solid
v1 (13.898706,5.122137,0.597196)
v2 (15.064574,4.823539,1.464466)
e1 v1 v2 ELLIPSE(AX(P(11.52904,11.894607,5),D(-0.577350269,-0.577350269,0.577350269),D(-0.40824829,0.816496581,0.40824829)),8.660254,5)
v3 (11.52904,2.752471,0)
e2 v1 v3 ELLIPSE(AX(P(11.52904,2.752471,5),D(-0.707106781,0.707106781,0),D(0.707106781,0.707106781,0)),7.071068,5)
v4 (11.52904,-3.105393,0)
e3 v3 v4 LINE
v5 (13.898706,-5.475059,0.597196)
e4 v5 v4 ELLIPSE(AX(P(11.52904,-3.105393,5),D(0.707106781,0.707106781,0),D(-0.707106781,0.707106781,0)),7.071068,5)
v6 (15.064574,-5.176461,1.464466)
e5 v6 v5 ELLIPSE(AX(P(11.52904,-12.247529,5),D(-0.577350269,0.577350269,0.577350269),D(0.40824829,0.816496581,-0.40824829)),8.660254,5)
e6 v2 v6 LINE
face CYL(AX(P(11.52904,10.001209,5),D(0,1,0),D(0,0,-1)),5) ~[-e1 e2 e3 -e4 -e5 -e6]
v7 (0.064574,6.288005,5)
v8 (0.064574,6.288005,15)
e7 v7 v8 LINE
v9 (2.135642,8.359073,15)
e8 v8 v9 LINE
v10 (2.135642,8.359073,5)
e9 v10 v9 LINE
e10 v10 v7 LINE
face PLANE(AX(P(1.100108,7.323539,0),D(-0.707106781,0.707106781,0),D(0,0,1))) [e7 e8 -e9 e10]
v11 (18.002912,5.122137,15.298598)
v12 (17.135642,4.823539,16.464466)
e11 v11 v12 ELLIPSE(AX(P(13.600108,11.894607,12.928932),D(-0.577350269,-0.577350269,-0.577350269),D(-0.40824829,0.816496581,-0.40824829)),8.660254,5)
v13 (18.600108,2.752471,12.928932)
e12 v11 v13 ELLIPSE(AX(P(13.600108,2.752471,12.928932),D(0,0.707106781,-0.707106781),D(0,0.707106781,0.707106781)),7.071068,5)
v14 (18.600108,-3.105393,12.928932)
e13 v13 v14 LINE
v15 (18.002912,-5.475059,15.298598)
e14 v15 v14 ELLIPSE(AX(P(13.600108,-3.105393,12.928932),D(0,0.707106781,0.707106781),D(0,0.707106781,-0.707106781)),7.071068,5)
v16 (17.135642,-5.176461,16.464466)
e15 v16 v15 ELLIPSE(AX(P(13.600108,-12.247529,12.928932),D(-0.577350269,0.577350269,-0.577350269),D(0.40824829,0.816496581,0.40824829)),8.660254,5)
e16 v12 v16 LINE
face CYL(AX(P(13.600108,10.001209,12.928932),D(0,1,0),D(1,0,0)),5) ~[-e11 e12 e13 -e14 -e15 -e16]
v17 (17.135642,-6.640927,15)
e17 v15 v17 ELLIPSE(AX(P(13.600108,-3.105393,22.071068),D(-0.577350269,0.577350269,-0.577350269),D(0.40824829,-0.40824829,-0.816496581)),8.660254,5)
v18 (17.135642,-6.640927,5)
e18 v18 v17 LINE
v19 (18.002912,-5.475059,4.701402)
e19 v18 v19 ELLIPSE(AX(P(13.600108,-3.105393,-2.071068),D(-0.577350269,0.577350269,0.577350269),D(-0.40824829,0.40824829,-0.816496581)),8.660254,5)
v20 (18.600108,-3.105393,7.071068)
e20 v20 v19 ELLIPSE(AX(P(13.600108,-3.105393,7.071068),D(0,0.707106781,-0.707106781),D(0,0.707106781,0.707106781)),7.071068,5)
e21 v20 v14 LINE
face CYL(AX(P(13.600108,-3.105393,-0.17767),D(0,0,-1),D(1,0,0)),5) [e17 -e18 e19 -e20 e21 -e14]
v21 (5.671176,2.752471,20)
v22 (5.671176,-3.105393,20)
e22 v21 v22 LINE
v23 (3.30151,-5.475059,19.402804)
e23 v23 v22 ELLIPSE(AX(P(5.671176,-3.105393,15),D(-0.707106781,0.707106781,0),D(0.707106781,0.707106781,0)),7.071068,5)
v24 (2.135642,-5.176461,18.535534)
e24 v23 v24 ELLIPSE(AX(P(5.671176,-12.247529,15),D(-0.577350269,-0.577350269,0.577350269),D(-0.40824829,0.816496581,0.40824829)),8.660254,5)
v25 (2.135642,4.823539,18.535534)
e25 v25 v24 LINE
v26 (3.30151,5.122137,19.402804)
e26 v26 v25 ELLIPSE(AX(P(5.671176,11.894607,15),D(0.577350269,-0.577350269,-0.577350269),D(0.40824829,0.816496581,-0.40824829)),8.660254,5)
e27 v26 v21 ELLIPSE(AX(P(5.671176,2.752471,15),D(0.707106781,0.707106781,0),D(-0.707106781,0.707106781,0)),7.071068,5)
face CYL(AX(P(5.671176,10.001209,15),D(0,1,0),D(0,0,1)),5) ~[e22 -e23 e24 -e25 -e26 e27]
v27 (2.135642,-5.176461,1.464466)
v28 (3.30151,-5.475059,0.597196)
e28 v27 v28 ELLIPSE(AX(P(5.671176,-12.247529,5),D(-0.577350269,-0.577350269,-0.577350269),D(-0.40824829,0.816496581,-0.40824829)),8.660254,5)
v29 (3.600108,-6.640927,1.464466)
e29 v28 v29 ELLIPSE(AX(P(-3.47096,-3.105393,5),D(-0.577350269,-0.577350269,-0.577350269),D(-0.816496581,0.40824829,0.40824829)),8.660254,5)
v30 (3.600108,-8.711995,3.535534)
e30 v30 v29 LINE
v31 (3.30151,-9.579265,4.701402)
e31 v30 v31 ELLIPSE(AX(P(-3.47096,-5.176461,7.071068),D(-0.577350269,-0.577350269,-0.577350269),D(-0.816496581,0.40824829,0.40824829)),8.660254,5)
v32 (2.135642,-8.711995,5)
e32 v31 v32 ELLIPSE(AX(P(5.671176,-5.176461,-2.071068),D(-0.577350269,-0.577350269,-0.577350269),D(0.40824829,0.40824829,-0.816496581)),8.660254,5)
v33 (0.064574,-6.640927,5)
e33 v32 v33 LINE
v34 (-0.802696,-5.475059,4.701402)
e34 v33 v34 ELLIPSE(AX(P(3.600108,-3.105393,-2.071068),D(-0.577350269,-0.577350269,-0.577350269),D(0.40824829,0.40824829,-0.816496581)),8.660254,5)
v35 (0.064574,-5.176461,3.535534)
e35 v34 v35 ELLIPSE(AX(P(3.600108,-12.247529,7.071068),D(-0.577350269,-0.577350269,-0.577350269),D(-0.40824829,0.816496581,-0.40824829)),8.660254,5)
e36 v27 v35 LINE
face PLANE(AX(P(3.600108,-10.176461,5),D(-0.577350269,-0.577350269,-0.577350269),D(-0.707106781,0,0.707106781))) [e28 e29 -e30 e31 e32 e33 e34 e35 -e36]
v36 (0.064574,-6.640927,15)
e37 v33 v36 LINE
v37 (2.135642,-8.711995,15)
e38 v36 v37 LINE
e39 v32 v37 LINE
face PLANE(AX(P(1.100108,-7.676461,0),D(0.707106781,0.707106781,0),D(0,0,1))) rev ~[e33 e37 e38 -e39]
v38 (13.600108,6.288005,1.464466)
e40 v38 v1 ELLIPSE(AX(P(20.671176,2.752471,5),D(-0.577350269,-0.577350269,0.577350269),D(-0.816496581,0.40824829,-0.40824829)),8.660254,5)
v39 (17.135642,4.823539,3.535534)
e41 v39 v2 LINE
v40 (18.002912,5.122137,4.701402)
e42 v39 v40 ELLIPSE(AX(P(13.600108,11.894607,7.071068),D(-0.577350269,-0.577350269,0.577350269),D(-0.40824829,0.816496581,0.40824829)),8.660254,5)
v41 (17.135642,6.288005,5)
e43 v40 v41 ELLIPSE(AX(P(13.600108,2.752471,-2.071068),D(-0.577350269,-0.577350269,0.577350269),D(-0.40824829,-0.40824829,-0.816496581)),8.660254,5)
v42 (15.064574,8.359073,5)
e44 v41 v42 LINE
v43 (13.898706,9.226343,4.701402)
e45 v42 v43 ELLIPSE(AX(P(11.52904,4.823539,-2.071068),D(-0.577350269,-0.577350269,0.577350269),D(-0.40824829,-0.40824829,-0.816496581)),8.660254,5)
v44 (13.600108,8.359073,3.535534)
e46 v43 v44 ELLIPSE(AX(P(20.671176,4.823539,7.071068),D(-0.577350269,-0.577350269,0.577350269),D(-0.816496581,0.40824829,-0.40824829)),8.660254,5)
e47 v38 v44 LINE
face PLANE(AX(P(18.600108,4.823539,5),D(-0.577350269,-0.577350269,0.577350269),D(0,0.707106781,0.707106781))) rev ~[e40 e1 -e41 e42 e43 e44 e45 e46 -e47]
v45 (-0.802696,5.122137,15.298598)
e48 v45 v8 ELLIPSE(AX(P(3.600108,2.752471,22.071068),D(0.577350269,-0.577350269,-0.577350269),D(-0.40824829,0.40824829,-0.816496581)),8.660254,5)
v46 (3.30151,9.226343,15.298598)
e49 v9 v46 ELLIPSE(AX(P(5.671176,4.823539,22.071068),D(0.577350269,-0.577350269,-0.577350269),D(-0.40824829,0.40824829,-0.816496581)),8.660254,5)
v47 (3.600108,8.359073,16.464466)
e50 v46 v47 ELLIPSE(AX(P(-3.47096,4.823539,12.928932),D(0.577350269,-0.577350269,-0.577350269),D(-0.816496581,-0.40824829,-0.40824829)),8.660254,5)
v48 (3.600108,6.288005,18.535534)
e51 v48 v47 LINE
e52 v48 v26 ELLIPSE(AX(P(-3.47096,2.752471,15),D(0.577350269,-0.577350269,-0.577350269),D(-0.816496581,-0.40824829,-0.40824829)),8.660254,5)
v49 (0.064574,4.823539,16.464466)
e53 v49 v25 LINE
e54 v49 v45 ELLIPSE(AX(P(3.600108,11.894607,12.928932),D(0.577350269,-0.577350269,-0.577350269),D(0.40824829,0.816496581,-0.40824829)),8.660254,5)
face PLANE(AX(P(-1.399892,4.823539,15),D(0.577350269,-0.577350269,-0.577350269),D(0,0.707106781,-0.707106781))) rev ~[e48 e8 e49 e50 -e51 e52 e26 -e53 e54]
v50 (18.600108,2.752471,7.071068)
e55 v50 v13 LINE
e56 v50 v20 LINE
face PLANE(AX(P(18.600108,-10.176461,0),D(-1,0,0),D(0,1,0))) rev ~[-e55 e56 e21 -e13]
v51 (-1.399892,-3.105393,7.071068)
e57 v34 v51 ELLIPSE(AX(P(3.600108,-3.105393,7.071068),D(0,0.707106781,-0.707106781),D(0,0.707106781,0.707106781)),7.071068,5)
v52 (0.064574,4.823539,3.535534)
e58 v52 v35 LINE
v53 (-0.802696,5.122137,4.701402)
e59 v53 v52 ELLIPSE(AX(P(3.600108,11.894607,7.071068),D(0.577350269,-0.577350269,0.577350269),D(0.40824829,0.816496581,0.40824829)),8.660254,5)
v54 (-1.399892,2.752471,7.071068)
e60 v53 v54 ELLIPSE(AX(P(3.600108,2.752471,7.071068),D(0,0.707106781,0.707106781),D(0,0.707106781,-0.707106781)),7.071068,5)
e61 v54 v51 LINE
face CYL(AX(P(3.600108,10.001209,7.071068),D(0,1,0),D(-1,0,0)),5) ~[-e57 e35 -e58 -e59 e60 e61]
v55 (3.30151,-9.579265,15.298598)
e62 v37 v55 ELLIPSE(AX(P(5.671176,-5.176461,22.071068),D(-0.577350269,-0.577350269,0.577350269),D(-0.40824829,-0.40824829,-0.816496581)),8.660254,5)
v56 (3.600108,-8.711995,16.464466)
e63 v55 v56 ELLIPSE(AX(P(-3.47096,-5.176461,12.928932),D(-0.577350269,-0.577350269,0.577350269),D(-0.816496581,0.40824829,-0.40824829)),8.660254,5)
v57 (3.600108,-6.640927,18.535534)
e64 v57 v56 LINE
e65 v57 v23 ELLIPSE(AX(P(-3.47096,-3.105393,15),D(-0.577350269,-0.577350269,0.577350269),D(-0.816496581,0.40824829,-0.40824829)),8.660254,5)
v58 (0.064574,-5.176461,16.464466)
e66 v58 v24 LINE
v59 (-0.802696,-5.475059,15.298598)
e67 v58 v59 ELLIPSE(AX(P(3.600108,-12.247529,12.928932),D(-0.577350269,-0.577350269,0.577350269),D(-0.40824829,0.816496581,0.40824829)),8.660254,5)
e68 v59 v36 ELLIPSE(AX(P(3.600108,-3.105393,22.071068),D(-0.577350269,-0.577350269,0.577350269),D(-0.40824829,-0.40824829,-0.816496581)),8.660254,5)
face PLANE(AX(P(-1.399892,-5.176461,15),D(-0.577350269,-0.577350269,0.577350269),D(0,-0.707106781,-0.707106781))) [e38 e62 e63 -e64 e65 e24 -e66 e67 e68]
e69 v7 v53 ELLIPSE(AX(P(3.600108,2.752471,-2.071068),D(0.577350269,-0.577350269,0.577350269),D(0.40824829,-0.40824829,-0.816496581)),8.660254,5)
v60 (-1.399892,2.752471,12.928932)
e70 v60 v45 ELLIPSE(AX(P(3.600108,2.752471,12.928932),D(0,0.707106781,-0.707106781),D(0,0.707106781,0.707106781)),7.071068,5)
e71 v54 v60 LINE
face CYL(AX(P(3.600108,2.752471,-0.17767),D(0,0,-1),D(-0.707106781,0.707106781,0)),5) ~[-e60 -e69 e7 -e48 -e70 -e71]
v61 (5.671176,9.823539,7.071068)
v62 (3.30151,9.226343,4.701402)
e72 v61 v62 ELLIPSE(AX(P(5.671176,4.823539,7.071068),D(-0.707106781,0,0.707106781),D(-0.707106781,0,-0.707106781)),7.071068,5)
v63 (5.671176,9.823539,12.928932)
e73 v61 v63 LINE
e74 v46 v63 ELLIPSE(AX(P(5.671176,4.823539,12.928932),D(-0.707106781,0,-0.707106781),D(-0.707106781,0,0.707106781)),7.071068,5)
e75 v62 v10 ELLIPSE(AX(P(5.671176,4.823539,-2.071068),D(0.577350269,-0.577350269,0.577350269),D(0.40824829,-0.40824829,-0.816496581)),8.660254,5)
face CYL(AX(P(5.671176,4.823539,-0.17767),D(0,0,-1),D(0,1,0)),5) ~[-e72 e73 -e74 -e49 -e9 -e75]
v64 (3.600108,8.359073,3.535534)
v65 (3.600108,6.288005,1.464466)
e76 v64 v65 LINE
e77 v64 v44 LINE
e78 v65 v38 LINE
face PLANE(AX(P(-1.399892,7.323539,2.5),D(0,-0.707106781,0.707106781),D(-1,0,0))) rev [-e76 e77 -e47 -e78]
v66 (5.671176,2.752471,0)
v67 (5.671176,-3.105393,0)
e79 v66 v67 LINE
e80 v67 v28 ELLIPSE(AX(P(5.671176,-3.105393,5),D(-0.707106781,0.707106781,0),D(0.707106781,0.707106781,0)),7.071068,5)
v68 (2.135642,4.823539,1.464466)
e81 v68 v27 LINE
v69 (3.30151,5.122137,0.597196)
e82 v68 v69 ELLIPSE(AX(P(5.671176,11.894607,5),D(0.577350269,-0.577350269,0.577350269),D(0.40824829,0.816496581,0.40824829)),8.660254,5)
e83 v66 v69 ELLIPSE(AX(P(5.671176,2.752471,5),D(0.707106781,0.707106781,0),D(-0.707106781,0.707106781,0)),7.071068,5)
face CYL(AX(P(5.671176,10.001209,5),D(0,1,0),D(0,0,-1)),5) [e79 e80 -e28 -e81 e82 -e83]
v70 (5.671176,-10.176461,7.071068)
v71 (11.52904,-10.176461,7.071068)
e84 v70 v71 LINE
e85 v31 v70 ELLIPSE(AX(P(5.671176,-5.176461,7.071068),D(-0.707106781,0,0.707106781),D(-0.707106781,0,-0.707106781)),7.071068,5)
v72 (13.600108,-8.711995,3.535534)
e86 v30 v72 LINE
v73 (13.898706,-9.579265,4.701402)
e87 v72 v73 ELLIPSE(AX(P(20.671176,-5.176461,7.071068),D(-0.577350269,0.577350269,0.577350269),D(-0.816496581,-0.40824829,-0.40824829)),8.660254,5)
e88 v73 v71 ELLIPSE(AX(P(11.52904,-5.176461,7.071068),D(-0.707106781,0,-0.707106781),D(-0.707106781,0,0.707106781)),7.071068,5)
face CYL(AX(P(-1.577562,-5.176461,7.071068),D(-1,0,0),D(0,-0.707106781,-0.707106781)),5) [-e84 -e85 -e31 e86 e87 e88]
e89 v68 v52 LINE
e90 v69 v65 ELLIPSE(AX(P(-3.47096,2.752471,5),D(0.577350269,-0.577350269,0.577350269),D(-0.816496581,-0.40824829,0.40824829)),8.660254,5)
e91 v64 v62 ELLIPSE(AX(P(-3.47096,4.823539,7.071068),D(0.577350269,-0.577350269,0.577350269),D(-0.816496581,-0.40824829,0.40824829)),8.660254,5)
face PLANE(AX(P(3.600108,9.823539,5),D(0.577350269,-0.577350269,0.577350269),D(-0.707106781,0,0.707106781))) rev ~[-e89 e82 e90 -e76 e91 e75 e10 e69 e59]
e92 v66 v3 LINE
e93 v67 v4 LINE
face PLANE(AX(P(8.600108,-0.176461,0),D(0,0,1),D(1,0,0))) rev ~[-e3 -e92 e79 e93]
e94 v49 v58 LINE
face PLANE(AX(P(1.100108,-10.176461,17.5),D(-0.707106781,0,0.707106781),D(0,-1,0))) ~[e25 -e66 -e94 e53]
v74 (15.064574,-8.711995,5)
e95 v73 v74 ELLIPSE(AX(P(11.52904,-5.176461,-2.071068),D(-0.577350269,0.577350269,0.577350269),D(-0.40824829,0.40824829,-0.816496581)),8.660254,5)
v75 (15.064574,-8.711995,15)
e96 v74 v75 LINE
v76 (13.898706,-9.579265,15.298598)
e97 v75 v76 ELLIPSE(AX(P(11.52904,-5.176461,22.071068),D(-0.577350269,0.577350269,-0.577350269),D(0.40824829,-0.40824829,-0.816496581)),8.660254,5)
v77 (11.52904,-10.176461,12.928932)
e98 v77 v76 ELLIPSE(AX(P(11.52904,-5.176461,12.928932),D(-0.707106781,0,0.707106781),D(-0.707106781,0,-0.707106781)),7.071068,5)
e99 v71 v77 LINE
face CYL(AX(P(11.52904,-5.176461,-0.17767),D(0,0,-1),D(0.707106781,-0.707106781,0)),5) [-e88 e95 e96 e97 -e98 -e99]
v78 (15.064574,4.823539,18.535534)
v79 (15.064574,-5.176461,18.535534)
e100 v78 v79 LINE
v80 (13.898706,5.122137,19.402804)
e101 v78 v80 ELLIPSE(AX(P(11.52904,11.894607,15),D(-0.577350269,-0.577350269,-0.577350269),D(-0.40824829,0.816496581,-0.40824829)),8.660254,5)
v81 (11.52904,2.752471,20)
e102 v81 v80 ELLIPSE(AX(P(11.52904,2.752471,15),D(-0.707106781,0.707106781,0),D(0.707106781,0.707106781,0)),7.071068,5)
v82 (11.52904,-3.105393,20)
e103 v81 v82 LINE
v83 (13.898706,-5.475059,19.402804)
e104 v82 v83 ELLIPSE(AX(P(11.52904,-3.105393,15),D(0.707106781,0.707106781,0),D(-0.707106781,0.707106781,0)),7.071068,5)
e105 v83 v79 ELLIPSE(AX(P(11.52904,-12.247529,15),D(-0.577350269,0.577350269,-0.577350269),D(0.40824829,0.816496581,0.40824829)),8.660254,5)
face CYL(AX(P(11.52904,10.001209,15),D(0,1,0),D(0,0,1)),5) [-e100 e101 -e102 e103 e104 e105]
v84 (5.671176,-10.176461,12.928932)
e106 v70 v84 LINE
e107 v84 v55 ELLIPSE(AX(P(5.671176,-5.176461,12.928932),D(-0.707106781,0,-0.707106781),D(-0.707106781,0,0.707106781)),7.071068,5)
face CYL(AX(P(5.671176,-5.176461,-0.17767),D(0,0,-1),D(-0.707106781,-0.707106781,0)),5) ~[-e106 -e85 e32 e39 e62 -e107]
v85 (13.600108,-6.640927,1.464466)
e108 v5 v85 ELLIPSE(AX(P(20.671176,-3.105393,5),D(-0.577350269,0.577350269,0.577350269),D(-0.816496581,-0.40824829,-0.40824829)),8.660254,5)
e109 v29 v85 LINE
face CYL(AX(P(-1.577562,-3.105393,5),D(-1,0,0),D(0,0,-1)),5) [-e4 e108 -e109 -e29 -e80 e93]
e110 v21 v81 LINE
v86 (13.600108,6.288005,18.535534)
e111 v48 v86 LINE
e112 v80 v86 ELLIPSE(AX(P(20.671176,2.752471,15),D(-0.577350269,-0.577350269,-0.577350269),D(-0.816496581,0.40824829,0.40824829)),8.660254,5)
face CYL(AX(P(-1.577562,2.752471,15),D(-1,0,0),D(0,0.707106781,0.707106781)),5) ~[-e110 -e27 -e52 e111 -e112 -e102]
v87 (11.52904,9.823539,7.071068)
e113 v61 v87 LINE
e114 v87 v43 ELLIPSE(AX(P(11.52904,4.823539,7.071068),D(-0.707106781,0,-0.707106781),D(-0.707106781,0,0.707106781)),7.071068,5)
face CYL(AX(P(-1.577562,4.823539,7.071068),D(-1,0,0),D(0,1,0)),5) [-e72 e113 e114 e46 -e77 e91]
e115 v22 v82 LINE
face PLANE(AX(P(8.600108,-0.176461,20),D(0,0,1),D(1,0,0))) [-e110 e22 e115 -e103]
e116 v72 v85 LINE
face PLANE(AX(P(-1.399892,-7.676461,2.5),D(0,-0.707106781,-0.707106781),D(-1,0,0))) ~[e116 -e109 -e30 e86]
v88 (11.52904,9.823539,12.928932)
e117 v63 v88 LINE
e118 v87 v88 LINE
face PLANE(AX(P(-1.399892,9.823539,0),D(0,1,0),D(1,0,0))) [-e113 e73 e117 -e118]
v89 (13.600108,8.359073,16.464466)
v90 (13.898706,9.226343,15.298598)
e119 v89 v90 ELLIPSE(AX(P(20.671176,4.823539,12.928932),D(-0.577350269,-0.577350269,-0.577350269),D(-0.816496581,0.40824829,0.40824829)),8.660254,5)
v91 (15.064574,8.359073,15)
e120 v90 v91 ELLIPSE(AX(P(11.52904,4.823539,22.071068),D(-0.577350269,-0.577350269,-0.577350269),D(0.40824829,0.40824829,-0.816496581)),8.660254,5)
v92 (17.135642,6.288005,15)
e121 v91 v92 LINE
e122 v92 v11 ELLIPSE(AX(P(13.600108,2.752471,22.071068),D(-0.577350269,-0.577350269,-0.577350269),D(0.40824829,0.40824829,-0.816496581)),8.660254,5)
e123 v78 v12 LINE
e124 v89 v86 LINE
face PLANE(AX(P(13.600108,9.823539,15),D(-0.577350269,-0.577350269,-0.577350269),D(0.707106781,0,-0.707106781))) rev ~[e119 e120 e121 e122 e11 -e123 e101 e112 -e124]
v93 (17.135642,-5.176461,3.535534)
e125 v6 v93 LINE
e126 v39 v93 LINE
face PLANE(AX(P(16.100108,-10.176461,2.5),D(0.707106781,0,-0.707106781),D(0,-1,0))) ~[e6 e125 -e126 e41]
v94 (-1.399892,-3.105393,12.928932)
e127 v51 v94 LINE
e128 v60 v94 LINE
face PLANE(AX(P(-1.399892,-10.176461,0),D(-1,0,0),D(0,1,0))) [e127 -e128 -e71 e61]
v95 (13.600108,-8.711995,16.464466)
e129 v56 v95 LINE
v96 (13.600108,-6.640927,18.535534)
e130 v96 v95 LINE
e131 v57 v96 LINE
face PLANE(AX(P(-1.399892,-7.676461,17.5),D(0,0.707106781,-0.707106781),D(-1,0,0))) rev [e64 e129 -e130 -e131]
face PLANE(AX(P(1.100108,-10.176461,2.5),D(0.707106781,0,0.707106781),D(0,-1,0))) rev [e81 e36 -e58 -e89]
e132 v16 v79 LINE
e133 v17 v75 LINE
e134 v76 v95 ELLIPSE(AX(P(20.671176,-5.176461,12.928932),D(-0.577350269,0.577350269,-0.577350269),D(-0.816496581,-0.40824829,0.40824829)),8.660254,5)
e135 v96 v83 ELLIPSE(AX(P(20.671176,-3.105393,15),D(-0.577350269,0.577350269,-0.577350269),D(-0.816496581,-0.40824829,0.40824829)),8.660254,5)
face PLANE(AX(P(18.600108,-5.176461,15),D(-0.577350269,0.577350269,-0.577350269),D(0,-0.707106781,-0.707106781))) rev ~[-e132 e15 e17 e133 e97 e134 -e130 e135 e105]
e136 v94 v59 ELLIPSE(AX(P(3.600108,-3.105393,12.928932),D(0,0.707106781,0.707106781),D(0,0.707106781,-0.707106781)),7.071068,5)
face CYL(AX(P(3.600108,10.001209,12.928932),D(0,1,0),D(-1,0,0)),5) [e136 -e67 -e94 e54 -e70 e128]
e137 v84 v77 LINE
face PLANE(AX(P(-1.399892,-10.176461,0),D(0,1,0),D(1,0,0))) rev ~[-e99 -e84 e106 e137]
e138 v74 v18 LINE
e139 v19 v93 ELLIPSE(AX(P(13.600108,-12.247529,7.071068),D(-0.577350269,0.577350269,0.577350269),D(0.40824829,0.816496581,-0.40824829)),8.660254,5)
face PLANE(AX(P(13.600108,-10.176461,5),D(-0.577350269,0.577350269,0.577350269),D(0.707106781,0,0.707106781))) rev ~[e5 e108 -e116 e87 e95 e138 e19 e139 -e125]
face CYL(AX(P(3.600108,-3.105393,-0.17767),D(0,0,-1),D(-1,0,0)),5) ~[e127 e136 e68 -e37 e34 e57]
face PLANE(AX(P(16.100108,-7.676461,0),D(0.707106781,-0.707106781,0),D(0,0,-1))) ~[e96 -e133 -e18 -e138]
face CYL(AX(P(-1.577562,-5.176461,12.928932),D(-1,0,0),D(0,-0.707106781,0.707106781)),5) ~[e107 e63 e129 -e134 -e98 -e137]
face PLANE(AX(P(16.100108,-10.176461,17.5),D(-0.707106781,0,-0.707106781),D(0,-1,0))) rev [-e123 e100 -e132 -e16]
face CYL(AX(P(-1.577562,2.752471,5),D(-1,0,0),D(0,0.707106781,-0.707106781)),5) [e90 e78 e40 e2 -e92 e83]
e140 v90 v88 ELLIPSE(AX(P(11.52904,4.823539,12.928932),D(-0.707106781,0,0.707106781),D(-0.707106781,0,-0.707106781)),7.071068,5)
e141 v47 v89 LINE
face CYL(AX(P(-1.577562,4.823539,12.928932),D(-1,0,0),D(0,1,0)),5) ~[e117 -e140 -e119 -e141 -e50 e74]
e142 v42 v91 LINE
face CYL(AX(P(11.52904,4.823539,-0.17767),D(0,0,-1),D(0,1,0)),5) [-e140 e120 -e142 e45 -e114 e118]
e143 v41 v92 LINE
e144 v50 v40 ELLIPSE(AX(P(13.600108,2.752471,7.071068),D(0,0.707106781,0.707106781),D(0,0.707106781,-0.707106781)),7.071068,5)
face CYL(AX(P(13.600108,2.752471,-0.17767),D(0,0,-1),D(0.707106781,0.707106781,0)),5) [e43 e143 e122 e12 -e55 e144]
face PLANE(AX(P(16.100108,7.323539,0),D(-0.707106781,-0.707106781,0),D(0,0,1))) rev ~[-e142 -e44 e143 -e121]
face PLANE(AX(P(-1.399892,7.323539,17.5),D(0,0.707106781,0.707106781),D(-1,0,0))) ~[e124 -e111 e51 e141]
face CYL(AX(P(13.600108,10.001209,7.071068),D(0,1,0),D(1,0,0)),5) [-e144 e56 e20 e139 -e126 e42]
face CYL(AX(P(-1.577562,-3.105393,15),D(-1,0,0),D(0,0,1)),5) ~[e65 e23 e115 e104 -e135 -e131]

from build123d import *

# Parameters (mm, degrees)
F0_W        = 20
F0_H        = 20
F1_DEPTH    = 20
F2_SIZE     = 5
F3_T1_DEPTH = 20.3553390593
F3_T3_DEPTH = 20.3553390593
F3_T5_DEPTH = 20.3553390593


# Not quite as in the source:
# - a fillet or chamfer that OpenCascade refuses, or shapes differently, is made with other operations: its cross-section is extruded or revolved along the edge and cut away or added


with BuildPart() as f1:
    # F0 (on Top) → F1 (new body)
    with BuildSketch(Plane.XY):
        with Locations((8.6001078598, -0.1764608825)):
            Rectangle(F0_W, F0_H)
    extrude(amount=F1_DEPTH)

    # F2
    f2_edges = [f1.edges().sort_by_distance(p)[0] for p in [
        (8.600108, -10.176461, 20),
        (18.600108, -0.176461, 20),
        (8.600108, 9.823539, 20),
        (-1.399892, -0.176461, 20),
        (-1.399892, -0.176461, 0),
        (8.600108, 9.823539, 0),
        (18.600108, -0.176461, 0),
        (8.600108, -10.176461, 0),
        (-1.399892, 9.823539, 10),
        (18.600108, 9.823539, 10),
        (18.600108, -10.176461, 10),
        (-1.399892, -10.176461, 10),
    ]]
    chamfer(f2_edges, length=F2_SIZE)

    # F3: fillet of radius 5 on 24 edges, made by hand

    # F3_s2 → F3_t1 (cut)
    with BuildSketch(Plane.XZ.offset(-10.0012086472)):
        with BuildLine():
            ThreePointArc((11.529040048, 0), (13.4424572098, 0.3806023374), (15.0645739539, 1.4644660941))
            Line((15.0645739539, 1.4644660941), (13.6001078598, 0))
            Line((13.6001078598, 0), (11.529040048, 0))
        make_face()
        with BuildLine():
            ThreePointArc((18.6001078598, 7.0710678119), (18.2195055224, 5.15765065), (17.1356417658, 3.5355339059))
            Line((17.1356417658, 3.5355339059), (18.6001078598, 5))
            Line((18.6001078598, 5), (18.6001078598, 7.0710678119))
        make_face()
        with BuildLine():
            ThreePointArc((18.6001078598, 12.9289321881), (18.2195055224, 14.84234935), (17.1356417658, 16.4644660941))
            Line((17.1356417658, 16.4644660941), (18.6001078598, 15))
            Line((18.6001078598, 15), (18.6001078598, 12.9289321881))
        make_face()
        with BuildLine():
            ThreePointArc((11.529040048, 20), (13.4424572098, 19.6193976626), (15.0645739539, 18.5355339059))
            Line((15.0645739539, 18.5355339059), (13.6001078598, 20))
            Line((13.6001078598, 20), (11.529040048, 20))
        make_face()
        with BuildLine():
            ThreePointArc((5.6711756717, 20), (3.7577585099, 19.6193976626), (2.1356417658, 18.5355339059))
            Line((2.1356417658, 18.5355339059), (3.6001078598, 20))
            Line((3.6001078598, 20), (5.6711756717, 20))
        make_face()
        with BuildLine():
            ThreePointArc((-1.3998921402, 12.9289321881), (-1.0192898027, 14.84234935), (0.0645739539, 16.4644660941))
            Line((0.0645739539, 16.4644660941), (-1.3998921402, 15))
            Line((-1.3998921402, 15), (-1.3998921402, 12.9289321881))
        make_face()
        with BuildLine():
            ThreePointArc((-1.3998921402, 7.0710678119), (-1.0192898027, 5.15765065), (0.0645739539, 3.5355339059))
            Line((0.0645739539, 3.5355339059), (-1.3998921402, 5))
            Line((-1.3998921402, 5), (-1.3998921402, 7.0710678119))
        make_face()
        with BuildLine():
            ThreePointArc((5.6711756717, 0), (3.7577585099, 0.3806023374), (2.1356417658, 1.4644660941))
            Line((2.1356417658, 1.4644660941), (3.6001078598, 0))
            Line((3.6001078598, 0), (5.6711756717, 0))
        make_face()
    extrude(amount=F3_T1_DEPTH, mode=Mode.SUBTRACT)

    # F3_s4 → F3_t3 (cut)
    with BuildSketch(Plane.YZ.offset(-1.5775616698)):
        with BuildLine():
            ThreePointArc((9.8235391175, 7.0710678119), (9.4429367801, 5.15765065), (8.3590730234, 3.5355339059))
            Line((8.3590730234, 3.5355339059), (9.8235391175, 5))
            Line((9.8235391175, 5), (9.8235391175, 7.0710678119))
        make_face()
        with BuildLine():
            ThreePointArc((9.8235391175, 12.9289321881), (9.4429367801, 14.84234935), (8.3590730234, 16.4644660941))
            Line((8.3590730234, 16.4644660941), (9.8235391175, 15))
            Line((9.8235391175, 15), (9.8235391175, 12.9289321881))
        make_face()
        with BuildLine():
            ThreePointArc((6.2880052116, 1.4644660941), (4.6658884675, 0.3806023374), (2.7524713056, 0))
            Line((2.7524713056, 0), (4.8235391175, 0))
            Line((4.8235391175, 0), (6.2880052116, 1.4644660941))
        make_face()
        with BuildLine():
            ThreePointArc((-3.1053930706, 0), (-5.0188102325, 0.3806023374), (-6.6409269766, 1.4644660941))
            Line((-6.6409269766, 1.4644660941), (-5.1764608825, 0))
            Line((-5.1764608825, 0), (-3.1053930706, 0))
        make_face()
        with BuildLine():
            ThreePointArc((-8.7119947884, 3.5355339059), (-9.795858545, 5.15765065), (-10.1764608825, 7.0710678119))
            Line((-10.1764608825, 7.0710678119), (-10.1764608825, 5))
            Line((-10.1764608825, 5), (-8.7119947884, 3.5355339059))
        make_face()
        with BuildLine():
            ThreePointArc((-8.7119947884, 16.4644660941), (-9.795858545, 14.84234935), (-10.1764608825, 12.9289321881))
            Line((-10.1764608825, 12.9289321881), (-10.1764608825, 15))
            Line((-10.1764608825, 15), (-8.7119947884, 16.4644660941))
        make_face()
        with BuildLine():
            ThreePointArc((-3.1053930706, 20), (-5.0188102325, 19.6193976626), (-6.6409269766, 18.5355339059))
            Line((-6.6409269766, 18.5355339059), (-5.1764608825, 20))
            Line((-5.1764608825, 20), (-3.1053930706, 20))
        make_face()
        with BuildLine():
            ThreePointArc((6.2880052116, 18.5355339059), (4.6658884675, 19.6193976626), (2.7524713056, 20))
            Line((2.7524713056, 20), (4.8235391175, 20))
            Line((4.8235391175, 20), (6.2880052116, 18.5355339059))
        make_face()
    extrude(amount=F3_T3_DEPTH, mode=Mode.SUBTRACT)

    # F3_s6 → F3_t5 (cut)
    with BuildSketch(Plane.XY.offset(-0.1776695297)):
        with BuildLine():
            ThreePointArc((0.0645739539, 6.2880052116), (-1.0192898027, 4.6658884675), (-1.3998921402, 2.7524713056))
            Line((-1.3998921402, 2.7524713056), (-1.3998921402, 4.8235391175))
            Line((-1.3998921402, 4.8235391175), (0.0645739539, 6.2880052116))
        make_face()
        with BuildLine():
            ThreePointArc((5.6711756717, 9.8235391175), (3.7577585099, 9.4429367801), (2.1356417658, 8.3590730234))
            Line((2.1356417658, 8.3590730234), (3.6001078598, 9.8235391175))
            Line((3.6001078598, 9.8235391175), (5.6711756717, 9.8235391175))
        make_face()
        with BuildLine():
            ThreePointArc((11.529040048, 9.8235391175), (13.4424572098, 9.4429367801), (15.0645739539, 8.3590730234))
            Line((15.0645739539, 8.3590730234), (13.6001078598, 9.8235391175))
            Line((13.6001078598, 9.8235391175), (11.529040048, 9.8235391175))
        make_face()
        with BuildLine():
            ThreePointArc((17.1356417658, 6.2880052116), (18.2195055224, 4.6658884675), (18.6001078598, 2.7524713056))
            Line((18.6001078598, 2.7524713056), (18.6001078598, 4.8235391175))
            Line((18.6001078598, 4.8235391175), (17.1356417658, 6.2880052116))
        make_face()
        with BuildLine():
            ThreePointArc((18.6001078598, -3.1053930706), (18.2195055224, -5.0188102325), (17.1356417658, -6.6409269766))
            Line((17.1356417658, -6.6409269766), (18.6001078598, -5.1764608825))
            Line((18.6001078598, -5.1764608825), (18.6001078598, -3.1053930706))
        make_face()
        with BuildLine():
            ThreePointArc((15.0645739539, -8.7119947884), (13.4424572098, -9.795858545), (11.529040048, -10.1764608825))
            Line((11.529040048, -10.1764608825), (13.6001078598, -10.1764608825))
            Line((13.6001078598, -10.1764608825), (15.0645739539, -8.7119947884))
        make_face()
        with BuildLine():
            ThreePointArc((2.1356417658, -8.7119947884), (3.7577585099, -9.795858545), (5.6711756717, -10.1764608825))
            Line((5.6711756717, -10.1764608825), (3.6001078598, -10.1764608825))
            Line((3.6001078598, -10.1764608825), (2.1356417658, -8.7119947884))
        make_face()
        with BuildLine():
            ThreePointArc((-1.3998921402, -3.1053930706), (-1.0192898027, -5.0188102325), (0.0645739539, -6.6409269766))
            Line((0.0645739539, -6.6409269766), (-1.3998921402, -5.1764608825))
            Line((-1.3998921402, -5.1764608825), (-1.3998921402, -3.1053930706))
        make_face()
    extrude(amount=F3_T5_DEPTH, mode=Mode.SUBTRACT)


solid = f1.part
